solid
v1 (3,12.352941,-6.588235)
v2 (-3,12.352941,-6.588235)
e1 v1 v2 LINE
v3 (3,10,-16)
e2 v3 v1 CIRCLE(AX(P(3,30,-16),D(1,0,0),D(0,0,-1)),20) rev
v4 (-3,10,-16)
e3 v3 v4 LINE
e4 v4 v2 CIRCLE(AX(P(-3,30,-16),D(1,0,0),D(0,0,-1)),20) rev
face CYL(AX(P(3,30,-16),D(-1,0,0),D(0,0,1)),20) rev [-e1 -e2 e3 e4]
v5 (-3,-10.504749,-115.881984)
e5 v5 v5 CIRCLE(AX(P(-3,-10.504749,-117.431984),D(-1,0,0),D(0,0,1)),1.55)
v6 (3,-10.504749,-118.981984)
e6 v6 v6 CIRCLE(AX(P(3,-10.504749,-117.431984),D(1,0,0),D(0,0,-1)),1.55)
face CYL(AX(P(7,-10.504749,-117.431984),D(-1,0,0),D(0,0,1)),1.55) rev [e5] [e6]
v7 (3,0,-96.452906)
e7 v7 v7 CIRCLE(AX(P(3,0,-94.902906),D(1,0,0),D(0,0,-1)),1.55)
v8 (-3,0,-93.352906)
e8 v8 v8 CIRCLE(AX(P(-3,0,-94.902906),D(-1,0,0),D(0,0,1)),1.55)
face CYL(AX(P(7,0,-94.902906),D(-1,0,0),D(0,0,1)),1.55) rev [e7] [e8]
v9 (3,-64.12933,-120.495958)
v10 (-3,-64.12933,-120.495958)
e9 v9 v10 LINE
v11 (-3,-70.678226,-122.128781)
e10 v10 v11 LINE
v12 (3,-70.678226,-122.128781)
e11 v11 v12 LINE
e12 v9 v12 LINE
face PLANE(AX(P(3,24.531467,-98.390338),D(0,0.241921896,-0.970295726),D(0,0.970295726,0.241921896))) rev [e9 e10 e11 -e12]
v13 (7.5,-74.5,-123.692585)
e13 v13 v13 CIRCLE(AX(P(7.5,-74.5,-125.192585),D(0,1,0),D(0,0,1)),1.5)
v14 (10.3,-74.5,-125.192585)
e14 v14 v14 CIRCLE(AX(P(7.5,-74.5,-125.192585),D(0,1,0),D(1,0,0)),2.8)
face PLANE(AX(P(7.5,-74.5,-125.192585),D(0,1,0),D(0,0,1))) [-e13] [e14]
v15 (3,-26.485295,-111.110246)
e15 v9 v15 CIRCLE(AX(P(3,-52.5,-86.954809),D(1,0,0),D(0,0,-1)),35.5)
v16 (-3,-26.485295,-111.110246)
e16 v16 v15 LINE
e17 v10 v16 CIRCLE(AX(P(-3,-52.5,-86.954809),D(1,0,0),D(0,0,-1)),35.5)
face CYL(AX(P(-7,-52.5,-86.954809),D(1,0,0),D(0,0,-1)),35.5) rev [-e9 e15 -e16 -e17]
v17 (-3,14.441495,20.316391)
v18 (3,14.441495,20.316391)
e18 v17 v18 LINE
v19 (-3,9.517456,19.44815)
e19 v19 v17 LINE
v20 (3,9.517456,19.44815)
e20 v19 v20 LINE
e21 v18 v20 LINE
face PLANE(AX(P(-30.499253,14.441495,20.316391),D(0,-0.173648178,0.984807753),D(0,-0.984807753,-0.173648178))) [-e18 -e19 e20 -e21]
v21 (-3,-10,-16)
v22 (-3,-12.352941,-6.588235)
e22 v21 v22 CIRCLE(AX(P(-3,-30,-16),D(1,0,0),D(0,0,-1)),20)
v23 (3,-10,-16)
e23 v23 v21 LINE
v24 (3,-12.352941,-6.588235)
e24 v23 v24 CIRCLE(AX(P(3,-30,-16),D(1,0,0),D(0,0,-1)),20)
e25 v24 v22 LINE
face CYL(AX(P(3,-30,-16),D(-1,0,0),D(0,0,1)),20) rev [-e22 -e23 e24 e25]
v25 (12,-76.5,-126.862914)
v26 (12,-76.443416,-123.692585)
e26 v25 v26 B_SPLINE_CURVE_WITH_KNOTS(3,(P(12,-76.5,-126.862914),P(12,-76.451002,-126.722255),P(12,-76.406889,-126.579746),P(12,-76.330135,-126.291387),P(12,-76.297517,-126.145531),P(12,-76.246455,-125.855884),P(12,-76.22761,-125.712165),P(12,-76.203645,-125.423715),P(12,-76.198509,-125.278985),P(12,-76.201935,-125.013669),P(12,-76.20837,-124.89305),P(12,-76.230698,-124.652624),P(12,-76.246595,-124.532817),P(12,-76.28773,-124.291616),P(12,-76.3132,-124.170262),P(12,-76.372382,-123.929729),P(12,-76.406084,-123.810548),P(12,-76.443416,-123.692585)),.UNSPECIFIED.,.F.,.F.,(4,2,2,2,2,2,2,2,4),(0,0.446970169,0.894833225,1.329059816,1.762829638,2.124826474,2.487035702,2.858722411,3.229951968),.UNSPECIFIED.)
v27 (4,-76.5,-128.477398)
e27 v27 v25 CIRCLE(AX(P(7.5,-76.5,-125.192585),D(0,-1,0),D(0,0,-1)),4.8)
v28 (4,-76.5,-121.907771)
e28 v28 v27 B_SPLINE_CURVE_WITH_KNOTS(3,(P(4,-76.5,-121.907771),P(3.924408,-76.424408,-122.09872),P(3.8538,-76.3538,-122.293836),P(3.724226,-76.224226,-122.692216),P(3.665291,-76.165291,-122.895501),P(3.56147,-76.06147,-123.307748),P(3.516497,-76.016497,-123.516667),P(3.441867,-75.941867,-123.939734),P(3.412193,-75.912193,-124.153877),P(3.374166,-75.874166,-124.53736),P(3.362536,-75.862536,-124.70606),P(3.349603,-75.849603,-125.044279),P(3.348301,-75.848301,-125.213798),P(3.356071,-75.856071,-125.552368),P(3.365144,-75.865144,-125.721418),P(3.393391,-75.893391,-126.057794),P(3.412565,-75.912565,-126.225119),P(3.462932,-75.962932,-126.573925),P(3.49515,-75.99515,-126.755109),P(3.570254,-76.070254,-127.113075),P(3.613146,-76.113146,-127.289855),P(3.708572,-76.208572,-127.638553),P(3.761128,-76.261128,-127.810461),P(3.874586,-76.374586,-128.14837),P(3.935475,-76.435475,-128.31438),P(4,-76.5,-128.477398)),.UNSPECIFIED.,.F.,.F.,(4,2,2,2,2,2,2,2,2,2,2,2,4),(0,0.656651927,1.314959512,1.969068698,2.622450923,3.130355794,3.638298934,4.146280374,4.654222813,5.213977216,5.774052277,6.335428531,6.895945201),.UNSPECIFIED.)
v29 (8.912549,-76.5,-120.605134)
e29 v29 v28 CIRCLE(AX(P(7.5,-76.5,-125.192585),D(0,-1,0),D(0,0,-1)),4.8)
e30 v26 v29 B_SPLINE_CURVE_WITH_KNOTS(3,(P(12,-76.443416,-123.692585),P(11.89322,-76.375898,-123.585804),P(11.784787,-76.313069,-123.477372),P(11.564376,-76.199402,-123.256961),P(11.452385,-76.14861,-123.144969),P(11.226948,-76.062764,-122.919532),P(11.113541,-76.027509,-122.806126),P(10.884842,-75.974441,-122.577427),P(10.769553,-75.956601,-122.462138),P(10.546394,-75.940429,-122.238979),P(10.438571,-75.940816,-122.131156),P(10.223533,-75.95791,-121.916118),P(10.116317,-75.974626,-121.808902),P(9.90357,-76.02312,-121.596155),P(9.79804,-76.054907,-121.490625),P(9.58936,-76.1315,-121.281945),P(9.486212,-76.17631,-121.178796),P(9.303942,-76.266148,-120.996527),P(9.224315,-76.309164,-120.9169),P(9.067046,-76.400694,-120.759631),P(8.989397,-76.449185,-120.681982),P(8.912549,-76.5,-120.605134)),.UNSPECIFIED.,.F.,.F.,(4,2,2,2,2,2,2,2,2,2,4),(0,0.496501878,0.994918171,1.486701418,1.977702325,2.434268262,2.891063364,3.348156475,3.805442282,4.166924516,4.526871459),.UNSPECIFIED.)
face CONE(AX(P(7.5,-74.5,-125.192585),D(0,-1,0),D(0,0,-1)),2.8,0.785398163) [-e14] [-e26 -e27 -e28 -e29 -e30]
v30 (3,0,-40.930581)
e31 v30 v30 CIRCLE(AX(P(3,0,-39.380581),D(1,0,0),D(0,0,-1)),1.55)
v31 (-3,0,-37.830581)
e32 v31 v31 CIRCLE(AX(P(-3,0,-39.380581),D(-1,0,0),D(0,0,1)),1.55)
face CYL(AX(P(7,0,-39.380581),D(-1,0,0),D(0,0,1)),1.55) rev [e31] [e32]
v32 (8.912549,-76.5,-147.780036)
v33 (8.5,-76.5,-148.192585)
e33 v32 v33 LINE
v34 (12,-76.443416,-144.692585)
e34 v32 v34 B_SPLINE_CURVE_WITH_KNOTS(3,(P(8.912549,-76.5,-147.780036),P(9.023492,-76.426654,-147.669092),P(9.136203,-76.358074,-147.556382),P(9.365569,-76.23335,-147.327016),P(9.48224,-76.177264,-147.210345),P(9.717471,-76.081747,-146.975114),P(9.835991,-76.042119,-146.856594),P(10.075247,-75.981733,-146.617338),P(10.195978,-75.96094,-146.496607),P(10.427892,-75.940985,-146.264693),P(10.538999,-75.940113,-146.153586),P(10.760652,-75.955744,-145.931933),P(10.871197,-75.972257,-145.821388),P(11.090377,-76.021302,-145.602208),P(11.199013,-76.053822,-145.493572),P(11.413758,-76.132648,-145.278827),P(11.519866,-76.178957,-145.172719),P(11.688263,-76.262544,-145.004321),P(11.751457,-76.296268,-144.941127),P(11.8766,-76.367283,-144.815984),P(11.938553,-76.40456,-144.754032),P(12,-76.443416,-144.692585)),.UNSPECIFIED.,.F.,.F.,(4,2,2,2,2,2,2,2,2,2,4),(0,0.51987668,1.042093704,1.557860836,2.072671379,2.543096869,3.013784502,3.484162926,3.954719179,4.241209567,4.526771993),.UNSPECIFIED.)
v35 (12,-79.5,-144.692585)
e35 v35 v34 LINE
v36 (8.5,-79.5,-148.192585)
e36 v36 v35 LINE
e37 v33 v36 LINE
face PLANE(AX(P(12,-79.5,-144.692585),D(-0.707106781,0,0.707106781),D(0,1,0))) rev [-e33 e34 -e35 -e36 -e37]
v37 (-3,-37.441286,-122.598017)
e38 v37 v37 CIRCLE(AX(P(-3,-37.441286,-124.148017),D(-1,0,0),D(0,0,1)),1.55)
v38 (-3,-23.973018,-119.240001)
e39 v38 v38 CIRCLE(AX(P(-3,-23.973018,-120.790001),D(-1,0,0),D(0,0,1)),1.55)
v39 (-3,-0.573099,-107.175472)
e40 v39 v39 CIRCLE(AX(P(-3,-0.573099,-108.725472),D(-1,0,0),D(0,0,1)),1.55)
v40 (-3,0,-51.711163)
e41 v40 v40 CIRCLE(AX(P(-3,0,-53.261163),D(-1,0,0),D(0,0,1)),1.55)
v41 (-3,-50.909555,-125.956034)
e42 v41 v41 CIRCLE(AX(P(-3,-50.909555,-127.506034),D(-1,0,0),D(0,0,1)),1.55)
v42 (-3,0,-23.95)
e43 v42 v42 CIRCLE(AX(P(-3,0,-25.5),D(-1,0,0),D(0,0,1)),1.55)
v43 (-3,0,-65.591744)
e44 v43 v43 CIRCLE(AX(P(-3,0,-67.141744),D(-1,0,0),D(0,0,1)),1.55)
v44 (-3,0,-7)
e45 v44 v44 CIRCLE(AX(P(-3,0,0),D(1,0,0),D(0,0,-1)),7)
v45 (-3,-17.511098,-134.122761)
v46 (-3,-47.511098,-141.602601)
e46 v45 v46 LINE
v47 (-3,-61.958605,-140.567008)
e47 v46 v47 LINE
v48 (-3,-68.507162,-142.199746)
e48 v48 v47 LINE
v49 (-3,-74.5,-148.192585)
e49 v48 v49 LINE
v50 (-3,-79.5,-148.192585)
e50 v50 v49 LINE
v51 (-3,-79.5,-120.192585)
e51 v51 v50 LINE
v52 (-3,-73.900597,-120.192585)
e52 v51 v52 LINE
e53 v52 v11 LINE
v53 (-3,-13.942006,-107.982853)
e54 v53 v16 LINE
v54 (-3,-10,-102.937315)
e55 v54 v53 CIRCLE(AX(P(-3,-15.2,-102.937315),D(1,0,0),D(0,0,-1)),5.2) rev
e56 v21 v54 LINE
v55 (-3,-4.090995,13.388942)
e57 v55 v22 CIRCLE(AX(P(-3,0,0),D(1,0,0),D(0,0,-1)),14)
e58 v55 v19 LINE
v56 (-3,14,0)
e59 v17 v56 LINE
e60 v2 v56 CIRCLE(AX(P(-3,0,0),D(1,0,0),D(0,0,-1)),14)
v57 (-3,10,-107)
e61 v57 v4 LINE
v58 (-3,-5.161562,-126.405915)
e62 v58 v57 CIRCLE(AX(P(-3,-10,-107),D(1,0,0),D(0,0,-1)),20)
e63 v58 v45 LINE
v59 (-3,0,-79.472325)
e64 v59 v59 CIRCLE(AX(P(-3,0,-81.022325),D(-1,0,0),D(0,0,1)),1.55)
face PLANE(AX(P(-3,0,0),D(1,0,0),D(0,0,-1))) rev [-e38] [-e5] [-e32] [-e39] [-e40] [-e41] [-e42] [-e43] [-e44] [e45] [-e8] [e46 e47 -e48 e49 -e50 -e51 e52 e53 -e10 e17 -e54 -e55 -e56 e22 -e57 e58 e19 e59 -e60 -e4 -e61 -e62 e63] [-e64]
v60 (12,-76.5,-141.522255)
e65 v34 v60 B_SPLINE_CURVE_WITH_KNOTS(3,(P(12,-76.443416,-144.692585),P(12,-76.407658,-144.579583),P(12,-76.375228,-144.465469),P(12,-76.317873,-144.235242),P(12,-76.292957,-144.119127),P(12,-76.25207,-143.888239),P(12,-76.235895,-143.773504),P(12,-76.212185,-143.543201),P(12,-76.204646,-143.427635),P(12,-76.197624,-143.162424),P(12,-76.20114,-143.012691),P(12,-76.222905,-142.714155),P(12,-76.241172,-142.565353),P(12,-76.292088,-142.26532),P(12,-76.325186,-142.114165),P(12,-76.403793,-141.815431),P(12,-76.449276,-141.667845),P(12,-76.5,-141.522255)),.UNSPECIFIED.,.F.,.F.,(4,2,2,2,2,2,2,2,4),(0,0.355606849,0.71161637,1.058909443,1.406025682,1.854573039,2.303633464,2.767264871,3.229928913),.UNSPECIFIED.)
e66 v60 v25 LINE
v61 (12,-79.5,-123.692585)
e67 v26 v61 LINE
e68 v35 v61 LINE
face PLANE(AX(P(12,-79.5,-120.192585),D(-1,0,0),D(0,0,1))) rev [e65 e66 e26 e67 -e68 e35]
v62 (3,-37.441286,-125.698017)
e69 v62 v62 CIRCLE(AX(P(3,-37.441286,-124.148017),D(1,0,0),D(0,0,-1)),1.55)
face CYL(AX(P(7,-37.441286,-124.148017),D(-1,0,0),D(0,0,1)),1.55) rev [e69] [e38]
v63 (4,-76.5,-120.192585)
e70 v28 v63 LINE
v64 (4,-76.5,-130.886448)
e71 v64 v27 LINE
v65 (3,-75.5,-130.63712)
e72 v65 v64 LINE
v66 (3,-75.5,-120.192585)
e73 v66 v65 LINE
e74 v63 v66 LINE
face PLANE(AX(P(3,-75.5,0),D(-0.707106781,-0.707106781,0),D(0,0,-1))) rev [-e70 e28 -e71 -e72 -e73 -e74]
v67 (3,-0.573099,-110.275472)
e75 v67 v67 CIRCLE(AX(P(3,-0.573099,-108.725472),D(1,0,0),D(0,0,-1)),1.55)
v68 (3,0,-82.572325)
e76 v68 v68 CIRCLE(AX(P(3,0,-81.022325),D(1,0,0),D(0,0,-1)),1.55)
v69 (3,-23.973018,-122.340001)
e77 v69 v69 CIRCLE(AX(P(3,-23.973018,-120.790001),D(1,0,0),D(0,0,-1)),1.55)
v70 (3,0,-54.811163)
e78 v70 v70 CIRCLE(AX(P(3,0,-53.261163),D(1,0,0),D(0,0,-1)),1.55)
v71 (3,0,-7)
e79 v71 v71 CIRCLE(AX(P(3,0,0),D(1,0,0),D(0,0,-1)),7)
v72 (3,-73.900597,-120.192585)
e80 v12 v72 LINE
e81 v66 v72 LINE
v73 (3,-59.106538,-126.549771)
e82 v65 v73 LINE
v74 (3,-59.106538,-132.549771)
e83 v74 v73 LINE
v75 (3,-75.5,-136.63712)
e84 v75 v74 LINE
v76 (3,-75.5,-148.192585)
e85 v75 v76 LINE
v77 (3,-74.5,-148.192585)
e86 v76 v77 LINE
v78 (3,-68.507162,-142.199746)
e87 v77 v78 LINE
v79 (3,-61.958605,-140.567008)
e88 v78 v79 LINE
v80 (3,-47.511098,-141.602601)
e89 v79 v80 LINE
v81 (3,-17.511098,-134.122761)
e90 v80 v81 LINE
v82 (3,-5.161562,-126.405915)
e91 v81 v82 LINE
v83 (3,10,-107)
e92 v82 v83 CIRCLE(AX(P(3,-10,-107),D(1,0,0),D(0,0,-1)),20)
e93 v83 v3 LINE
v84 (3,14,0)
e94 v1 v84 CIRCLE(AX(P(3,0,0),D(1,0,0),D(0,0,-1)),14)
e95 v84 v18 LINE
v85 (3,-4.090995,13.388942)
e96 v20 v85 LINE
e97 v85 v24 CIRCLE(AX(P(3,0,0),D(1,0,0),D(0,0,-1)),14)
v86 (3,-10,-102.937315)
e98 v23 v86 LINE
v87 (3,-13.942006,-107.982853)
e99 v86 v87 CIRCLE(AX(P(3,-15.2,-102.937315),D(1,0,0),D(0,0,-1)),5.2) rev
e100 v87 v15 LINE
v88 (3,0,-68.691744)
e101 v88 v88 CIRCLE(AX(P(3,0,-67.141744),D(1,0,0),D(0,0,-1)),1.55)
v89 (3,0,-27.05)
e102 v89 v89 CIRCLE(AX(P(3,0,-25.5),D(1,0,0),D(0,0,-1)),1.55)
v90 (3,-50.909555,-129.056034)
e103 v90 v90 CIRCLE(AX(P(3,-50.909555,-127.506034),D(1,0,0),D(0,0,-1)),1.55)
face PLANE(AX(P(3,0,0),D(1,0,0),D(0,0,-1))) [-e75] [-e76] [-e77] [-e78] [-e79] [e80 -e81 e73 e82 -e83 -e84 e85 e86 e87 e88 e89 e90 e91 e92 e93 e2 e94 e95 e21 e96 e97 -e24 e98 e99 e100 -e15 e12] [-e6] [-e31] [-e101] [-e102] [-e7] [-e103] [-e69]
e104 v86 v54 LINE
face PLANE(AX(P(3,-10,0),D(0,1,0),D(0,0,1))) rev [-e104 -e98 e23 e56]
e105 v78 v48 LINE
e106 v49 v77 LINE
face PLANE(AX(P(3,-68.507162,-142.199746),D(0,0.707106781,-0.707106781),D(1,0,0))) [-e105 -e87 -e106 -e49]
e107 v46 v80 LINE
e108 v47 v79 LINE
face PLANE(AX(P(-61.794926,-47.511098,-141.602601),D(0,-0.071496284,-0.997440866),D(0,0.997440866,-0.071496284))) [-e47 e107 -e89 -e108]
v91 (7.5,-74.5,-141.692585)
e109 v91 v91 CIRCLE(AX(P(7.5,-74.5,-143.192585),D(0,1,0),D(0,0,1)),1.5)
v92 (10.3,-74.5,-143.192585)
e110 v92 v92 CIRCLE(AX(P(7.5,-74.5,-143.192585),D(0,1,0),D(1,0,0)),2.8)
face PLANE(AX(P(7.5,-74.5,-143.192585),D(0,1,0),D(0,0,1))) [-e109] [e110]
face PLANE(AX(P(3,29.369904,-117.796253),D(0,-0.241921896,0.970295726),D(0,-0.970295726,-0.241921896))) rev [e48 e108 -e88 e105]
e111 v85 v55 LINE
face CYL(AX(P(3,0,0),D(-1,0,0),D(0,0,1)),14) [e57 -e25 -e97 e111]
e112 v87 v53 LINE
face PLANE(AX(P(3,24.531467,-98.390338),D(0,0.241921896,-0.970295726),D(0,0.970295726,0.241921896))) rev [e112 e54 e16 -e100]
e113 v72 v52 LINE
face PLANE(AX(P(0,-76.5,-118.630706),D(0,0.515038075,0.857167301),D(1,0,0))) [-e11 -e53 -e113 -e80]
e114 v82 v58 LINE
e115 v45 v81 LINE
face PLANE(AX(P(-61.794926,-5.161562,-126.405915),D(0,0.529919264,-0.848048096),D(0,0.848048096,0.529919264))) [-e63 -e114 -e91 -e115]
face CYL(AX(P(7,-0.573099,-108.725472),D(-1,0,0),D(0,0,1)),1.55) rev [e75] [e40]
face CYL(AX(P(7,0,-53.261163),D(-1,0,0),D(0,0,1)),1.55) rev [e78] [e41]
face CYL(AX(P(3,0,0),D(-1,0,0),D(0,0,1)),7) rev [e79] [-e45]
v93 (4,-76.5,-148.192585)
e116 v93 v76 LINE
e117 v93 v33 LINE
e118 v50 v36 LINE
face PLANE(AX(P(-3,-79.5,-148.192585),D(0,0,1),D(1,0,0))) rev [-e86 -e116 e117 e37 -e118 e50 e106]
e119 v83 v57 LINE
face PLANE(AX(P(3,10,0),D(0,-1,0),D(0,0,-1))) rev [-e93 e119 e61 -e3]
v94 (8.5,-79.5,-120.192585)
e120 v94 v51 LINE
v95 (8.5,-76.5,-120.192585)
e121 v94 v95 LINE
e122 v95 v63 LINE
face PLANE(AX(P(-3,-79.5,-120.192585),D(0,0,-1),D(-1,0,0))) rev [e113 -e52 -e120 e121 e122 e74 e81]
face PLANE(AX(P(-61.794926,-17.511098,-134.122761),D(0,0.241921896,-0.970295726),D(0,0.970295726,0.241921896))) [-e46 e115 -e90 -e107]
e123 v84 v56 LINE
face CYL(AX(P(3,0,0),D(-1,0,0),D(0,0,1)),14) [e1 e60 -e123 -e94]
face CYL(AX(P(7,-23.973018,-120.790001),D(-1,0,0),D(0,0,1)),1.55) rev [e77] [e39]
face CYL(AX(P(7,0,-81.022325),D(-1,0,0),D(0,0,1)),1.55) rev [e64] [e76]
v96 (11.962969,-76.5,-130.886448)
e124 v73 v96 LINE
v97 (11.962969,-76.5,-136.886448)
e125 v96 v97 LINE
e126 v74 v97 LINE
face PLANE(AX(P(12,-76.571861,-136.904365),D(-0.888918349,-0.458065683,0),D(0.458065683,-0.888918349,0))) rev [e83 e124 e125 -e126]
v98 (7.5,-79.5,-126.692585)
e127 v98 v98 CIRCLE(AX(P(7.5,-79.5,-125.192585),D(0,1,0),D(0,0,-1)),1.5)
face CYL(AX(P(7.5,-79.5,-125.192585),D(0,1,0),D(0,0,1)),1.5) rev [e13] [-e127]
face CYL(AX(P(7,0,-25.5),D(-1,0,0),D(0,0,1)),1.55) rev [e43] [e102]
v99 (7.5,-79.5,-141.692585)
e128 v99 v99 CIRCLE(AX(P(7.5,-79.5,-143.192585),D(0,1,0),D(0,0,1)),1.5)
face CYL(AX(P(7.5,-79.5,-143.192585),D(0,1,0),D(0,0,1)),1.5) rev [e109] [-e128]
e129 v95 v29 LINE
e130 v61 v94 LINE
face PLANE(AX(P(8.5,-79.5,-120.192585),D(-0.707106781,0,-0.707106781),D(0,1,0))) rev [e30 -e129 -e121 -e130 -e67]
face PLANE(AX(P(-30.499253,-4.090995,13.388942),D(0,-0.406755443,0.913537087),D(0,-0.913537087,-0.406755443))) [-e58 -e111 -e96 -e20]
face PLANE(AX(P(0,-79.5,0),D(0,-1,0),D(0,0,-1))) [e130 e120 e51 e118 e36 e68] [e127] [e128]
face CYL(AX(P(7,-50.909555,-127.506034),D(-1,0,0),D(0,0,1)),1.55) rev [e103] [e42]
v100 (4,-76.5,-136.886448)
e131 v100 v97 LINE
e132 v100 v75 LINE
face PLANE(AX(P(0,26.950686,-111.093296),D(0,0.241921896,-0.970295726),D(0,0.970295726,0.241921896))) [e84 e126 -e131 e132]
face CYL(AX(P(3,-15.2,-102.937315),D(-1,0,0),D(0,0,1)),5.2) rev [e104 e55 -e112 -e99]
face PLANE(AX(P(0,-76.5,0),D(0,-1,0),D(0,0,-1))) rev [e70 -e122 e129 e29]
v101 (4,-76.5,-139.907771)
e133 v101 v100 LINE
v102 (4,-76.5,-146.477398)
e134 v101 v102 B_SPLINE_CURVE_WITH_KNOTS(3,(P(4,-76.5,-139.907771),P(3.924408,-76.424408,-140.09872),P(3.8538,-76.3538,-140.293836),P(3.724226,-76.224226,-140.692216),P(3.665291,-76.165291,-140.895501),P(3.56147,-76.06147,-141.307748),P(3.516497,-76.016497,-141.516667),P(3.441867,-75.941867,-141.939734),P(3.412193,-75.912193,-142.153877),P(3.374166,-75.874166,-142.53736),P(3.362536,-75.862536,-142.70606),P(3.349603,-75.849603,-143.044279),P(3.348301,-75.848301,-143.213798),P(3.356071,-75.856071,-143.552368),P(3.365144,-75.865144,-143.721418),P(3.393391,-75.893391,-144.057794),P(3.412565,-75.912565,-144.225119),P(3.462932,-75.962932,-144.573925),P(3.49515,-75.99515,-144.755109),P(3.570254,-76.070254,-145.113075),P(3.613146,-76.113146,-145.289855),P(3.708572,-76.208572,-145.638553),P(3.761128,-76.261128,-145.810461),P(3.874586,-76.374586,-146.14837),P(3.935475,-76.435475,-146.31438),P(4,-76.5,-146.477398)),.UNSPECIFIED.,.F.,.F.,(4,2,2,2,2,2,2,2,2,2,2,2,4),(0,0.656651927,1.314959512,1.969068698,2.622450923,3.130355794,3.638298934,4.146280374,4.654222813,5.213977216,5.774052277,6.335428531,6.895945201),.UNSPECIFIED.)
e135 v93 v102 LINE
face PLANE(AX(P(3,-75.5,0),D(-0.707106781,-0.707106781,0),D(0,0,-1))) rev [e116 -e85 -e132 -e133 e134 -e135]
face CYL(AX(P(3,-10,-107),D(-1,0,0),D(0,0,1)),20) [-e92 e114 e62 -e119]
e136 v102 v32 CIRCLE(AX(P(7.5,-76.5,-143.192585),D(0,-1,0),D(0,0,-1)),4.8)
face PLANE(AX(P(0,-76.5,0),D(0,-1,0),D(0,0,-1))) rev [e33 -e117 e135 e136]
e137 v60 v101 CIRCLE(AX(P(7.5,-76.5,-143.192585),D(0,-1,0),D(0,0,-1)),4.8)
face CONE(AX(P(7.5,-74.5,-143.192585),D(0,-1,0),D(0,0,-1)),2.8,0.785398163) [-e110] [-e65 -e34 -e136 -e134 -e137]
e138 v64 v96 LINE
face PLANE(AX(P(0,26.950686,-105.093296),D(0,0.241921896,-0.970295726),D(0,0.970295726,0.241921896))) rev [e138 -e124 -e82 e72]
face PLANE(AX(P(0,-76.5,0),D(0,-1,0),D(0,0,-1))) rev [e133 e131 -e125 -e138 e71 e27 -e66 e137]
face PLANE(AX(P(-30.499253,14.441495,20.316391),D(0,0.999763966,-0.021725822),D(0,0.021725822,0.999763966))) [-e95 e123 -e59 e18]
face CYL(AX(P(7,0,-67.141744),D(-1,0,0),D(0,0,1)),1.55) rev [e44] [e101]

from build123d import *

# Parameters (mm, degrees)
SKETCH_1_R                = 7
EXTRUDE_1_DEPTH           = 3
SKETCH_5_W                = 15
SKETCH_5_H                = 28
EXTRUDE_3_DEPTH           = 3
SKETCH_6_R                = 1.5
CUT_EXTRUDE_2_DEPTH       = 175.055428478
CHAMFER_1_SIZE            = 3.5
SKETCH_10_R               = 1.55
CUT_EXTRUDE_3_DEPTH       = 10
PATTERN_START             = -3
PATTERN_CURVE_1_OUTLINE_R = 1.55
PATTERN_CURVE_1_DEPTH     = 6
EXTRUDE_4_DEPTH           = 6
EXTRUDE_5_DEPTH           = 3
CHAMFER_2_SIZE            = 1
CHAMFER_3_SIZE            = 4.949606318
CHAMFER_3_SIZE_2          = 6
CHAMFER_3_SIZE_3          = 8.237528241
EXTRUDE_START             = 2
SKETCH_17_R               = 2.8
SKETCH_17_R_2             = 1.5
EXTRUDE_1_2_DEPTH         = 2
CHAMFER_4_SIZE            = 2
SKETCH1_R                 = 35.5
CUT_EXTRUDE1_DEPTH        = 10
BOSS_EXTRUDE1_DEPTH       = 6


# Read off the part's stored shape, not the designer's step: 曲线阵列1
with BuildPart() as part:
    # 草图1 → Extrude 1 (new, symmetric)
    with BuildSketch(Plane(origin=(0, 0, 0), x_dir=(0, 0, -1), z_dir=(1, 0, 0))):
        with BuildLine():
            ThreePointArc((102.937314742, -10), (106.138754414, -11.102344081), (107.982852519, -13.942006143))
            Line((107.982852519, -13.942006143), (123.580312189, -76.5))
            Line((123.580312189, -76.5), (144.192584776, -76.5))
            Line((144.192584776, -76.5), (126.405914526, -5.161562088))
            ThreePointArc((126.405914526, -5.161562088), (119.313229507, 5.760215072), (107, 10))
            Line((107, 10), (16, 10))
            ThreePointArc((16, 10), (11.149287499, 10.597149997), (6.588235294, 12.352941176))
            ThreePointArc((6.588235294, 12.352941176), (3.395498751, 13.581995002), (0, 14))
            Line((0, 14), (-18, 14))
            Line((-18, 14), (-18, 11))
            Line((-18, 11), (-13.388941598, -4.090995342))
            ThreePointArc((-13.388941598, -4.090995342), (-5.350452205, -12.937258643), (6.588235294, -12.352941176))
            ThreePointArc((6.588235294, -12.352941176), (11.149287499, -10.597149997), (16, -10))
            Line((16, -10), (102.937314742, -10))
        make_face()
        Circle(SKETCH_1_R, mode=Mode.SUBTRACT)
    extrude(amount=EXTRUDE_1_DEPTH, both=True)

    # 草图5 → 凸台-拉伸3 (add)
    with BuildSketch(Plane.XZ.offset(76.5)):
        with Locations((4.5, -134.192584776)):
            Rectangle(SKETCH_5_W, SKETCH_5_H)
    extrude(amount=EXTRUDE_3_DEPTH)

    # 草图6 → 切除-拉伸2 (cut, through all)
    with BuildSketch(Plane(origin=(0, -76.5, 0), x_dir=(1, 0, 0), z_dir=(0, 1, 0))):
        with Locations(Location((7.5, 143.192584776, 0), (0, 0, 270))):
            Circle(SKETCH_6_R)
        with Locations(Location((7.5, 125.192584776, 0), (0, 0, 90))):
            Circle(SKETCH_6_R)
    extrude(amount=-CUT_EXTRUDE_2_DEPTH, mode=Mode.SUBTRACT)

    # 倒角1
    chamfer_1_edges = [part.edges().sort_by_distance(p)[0] for p in [
        (12, -78, -148.192584776),
        (12, -78, -120.192584776),
    ]]
    chamfer(chamfer_1_edges, length=CHAMFER_1_SIZE)

    # 草图10 → 切除-拉伸3 (cut)
    with BuildSketch(Plane.ZY.offset(3)):
        with Locations((-25.5, 0)):
            Circle(SKETCH_10_R)
    extrude(amount=-CUT_EXTRUDE_3_DEPTH, mode=Mode.SUBTRACT)

    # 曲线阵列1 outline → 曲线阵列1 (cut)
    with BuildSketch(Plane.YZ.offset(PATTERN_START)):
        with Locations((-50.909555093, -127.506033962)):
            Circle(PATTERN_CURVE_1_OUTLINE_R)
        with Locations((-37.441286405, -124.148017428)):
            Circle(PATTERN_CURVE_1_OUTLINE_R)
        with Locations((-23.973017717, -120.790000895)):
            Circle(PATTERN_CURVE_1_OUTLINE_R)
        with Locations((-10.504749029, -117.431984361)):
            Circle(PATTERN_CURVE_1_OUTLINE_R)
        with Locations((-0.573099264, -108.725472335)):
            Circle(PATTERN_CURVE_1_OUTLINE_R)
        with Locations((0, -94.902906369)):
            Circle(PATTERN_CURVE_1_OUTLINE_R)
        with Locations((0, -81.022325095)):
            Circle(PATTERN_CURVE_1_OUTLINE_R)
        with Locations((0, -67.141743821)):
            Circle(PATTERN_CURVE_1_OUTLINE_R)
        with Locations((0, -53.261162547)):
            Circle(PATTERN_CURVE_1_OUTLINE_R)
        with Locations((0, -39.380581274)):
            Circle(PATTERN_CURVE_1_OUTLINE_R)
    extrude(amount=PATTERN_CURVE_1_DEPTH, mode=Mode.SUBTRACT)

    # 草图15 → 凸台-拉伸4 (add)
    with BuildSketch(Plane(origin=(3, 0, 0), x_dir=(0, 0, -1), z_dir=(1, 0, 0))):
        Polygon((-20.316390831, 14.441494507), (-19.448149943, 9.517455742), (-13.388941598, -4.090995342), (-18, 11), (-18, 14), (0, 14), align=None)
    extrude(amount=-EXTRUDE_4_DEPTH)

    # 草图16 → 凸台-拉伸5 (add, symmetric, along a direction that is not the sketch's normal)
    with BuildSketch(Plane(origin=(0, 26.950685529, -108.093295667), x_dir=(-1, 0, 0), z_dir=(0, 0.2419218955996646, -0.9702957262759974))):
        Polygon((-12, -106.691747545), (-3, -88.691747545), (-3, -106.691747545), align=None)
    extrude(amount=EXTRUDE_5_DEPTH, dir=(0, 0, -1), both=True)

    # 倒角2
    chamfer_2_edges = [part.edges().sort_by_distance(p)[0] for p in [
        (3, -76.5, -140.539516629),
        (3, -76.5, -127.233380336),
    ]]
    chamfer(chamfer_2_edges, length=CHAMFER_2_SIZE)

    # 倒角3
    # the kernel refuses this chamfer: 8.237528241, 6, 4.949606318 mm, written as the material it adds along each edge
    with BuildSketch(Plane(origin=(19.430097928, -76.5, -123.580312189), x_dir=(0, -0.04051695164362419, 0.9991788511720553), z_dir=(-1, 0, 0))) as chamfer_3_piece_1_section:
        Polygon((CHAMFER_3_SIZE * 0.999178851168, CHAMFER_3_SIZE * 0.0405169516434), (CHAMFER_3_SIZE_2 * 0.202409816697, CHAMFER_3_SIZE_2 * 0.979300906823), (0, 0), align=None)
    chamfer_3_piece_1 = extrude(amount=22.430097928, mode=Mode.PRIVATE)
    chamfer_3_piece_1 = split(chamfer_3_piece_1, bisect_by=Plane(origin=(3, -73.046454267, -121.751433379), z_dir=(-1, 0, 0)), keep=Keep.TOP, mode=Mode.PRIVATE)
    chamfer_3_piece_1 = split(chamfer_3_piece_1, bisect_by=Plane(origin=(1.773227133, -73.046454267, -120.192584776), z_dir=(0, 0, -1)), keep=Keep.TOP, mode=Mode.PRIVATE)
    add(chamfer_3_piece_1)
    with BuildSketch(Plane(origin=(19.430097928, -76.5, -123.580312189), x_dir=(0, -0.04051695164362419, 0.9991788511720553), z_dir=(-1, 0, 0))) as chamfer_3_piece_2_section:
        Polygon((CHAMFER_3_SIZE * 0.999178851168, CHAMFER_3_SIZE * 0.0405169516434), (CHAMFER_3_SIZE_2 * 0.202409816697, CHAMFER_3_SIZE_2 * 0.979300906823), (0, 0), align=None)
    chamfer_3_piece_2 = extrude(amount=22.430097928, mode=Mode.PRIVATE)
    chamfer_3_piece_2 = split(chamfer_3_piece_2, bisect_by=Plane(origin=(3.335429121, -76.170858242, -120.192584776), z_dir=(0, 0, -1)), keep=Keep.TOP, mode=Mode.PRIVATE)
    chamfer_3_piece_2 = split(chamfer_3_piece_2, bisect_by=Plane(origin=(3.503143682, -76.003143682, -121.845416354), z_dir=(-0.7071067811865476, -0.7071067811865476, 0)), keep=Keep.TOP, mode=Mode.PRIVATE)
    add(chamfer_3_piece_2)
    with BuildSketch(Plane(origin=(-3, -76.5, -144.192584776), x_dir=(4.057410477830116e-15, -0.037354428652640735, -0.9993020797837033), z_dir=(1, 0, 0))) as chamfer_3_piece_3_section:
        Polygon((CHAMFER_3_SIZE_2 * 0.999302079784, CHAMFER_3_SIZE_2 * 0.0373544286526), (-CHAMFER_3_SIZE_3 * 0.277997895888, CHAMFER_3_SIZE_3 * 0.960581683052), (0, 0), align=None)
    chamfer_3_piece_3 = extrude(amount=28.304139536, mode=Mode.PRIVATE)
    chamfer_3_piece_3 = split(chamfer_3_piece_3, bisect_by=Plane(origin=(0.670769547, -73.170769547, -145.630202159), z_dir=(-0.7071067811865476, -0.7071067811865476, 0)), keep=Keep.TOP, mode=Mode.PRIVATE)
    chamfer_3_piece_3 = split(chamfer_3_piece_3, bisect_by=Plane(origin=(-0.598503723, -74.440042816, -148.192584776), z_dir=(0, 0, 1)), keep=Keep.TOP, mode=Mode.PRIVATE)
    add(chamfer_3_piece_3)
    with BuildSketch(Plane(origin=(-3, -76.5, -144.192584776), x_dir=(4.057410477830116e-15, -0.037354428652640735, -0.9993020797837033), z_dir=(1, 0, 0))) as chamfer_3_piece_4_section:
        Polygon((CHAMFER_3_SIZE_2 * 0.999302079784, CHAMFER_3_SIZE_2 * 0.0373544286526), (-CHAMFER_3_SIZE_3 * 0.277997895888, CHAMFER_3_SIZE_3 * 0.960581683052), (0, 0), align=None)
    chamfer_3_piece_4 = extrude(amount=28.304139536, mode=Mode.PRIVATE)
    chamfer_3_piece_4 = split(chamfer_3_piece_4, bisect_by=Plane(origin=(3, -72.000472632, -144.373314083), z_dir=(-1, 0, 0)), keep=Keep.TOP, mode=Mode.PRIVATE)
    chamfer_3_piece_4 = split(chamfer_3_piece_4, bisect_by=Plane(origin=(1.258880845, -72.000472632, -148.192584776), z_dir=(0, 0, 1)), keep=Keep.TOP, mode=Mode.PRIVATE)
    add(chamfer_3_piece_4)

    # 草图17 → Extrude 1 2 (add)
    # profile 1 of 2: a face of its own
    with BuildSketch(Plane(origin=(0, -76.5, 0), x_dir=(1, 0, 0), z_dir=(0, 1, 0)).offset(EXTRUDE_START)):
        with Locations((7.5, 125.192584776)):
            Circle(SKETCH_17_R)
        with Locations((7.5, 125.192584776)):
            Circle(SKETCH_17_R_2, mode=Mode.SUBTRACT)
    # profile 2 of 2: a face of its own
    with BuildSketch(Plane(origin=(0, -76.5, 0), x_dir=(1, 0, 0), z_dir=(0, 1, 0)).offset(EXTRUDE_START)):
        with Locations((7.5, 143.192584776)):
            Circle(SKETCH_17_R)
        with Locations((7.5, 143.192584776)):
            Circle(SKETCH_17_R_2, mode=Mode.SUBTRACT)
    extrude(amount=-EXTRUDE_1_2_DEPTH)

    # 倒角4
    # the kernel refuses this chamfer: 2 mm, written as the material it adds along each edge
    with BuildSketch(Plane(origin=(7.5, -76.5, -125.192584776), x_dir=(1, 0, 0), z_dir=(0, 0, 1))) as chamfer_4_piece_1_section:
        Polygon((2.8 + CHAMFER_4_SIZE, 0), (2.8, CHAMFER_4_SIZE), (2.8, 0), align=None)
    chamfer_4_piece_1 = revolve(axis=Axis((7.5, -76.5, -125.192584776), (0, 1, 0)), mode=Mode.PRIVATE)
    chamfer_4_piece_1 = split(chamfer_4_piece_1, bisect_by=Plane(origin=(8.598627061, -75.553822664, -120.291211837), z_dir=(-0.7071067811865476, 0, -0.7071067811865476)), keep=Keep.TOP, mode=Mode.PRIVATE)
    chamfer_4_piece_1 = split(chamfer_4_piece_1, bisect_by=Plane(origin=(12, -75.553822664, -125.192584776), z_dir=(-1, 0, 0)), keep=Keep.TOP, mode=Mode.PRIVATE)
    chamfer_4_piece_1 = split(chamfer_4_piece_1, bisect_by=Plane(origin=(3.697254122, -74.5, -125.192584776), z_dir=(0, -1, 0)), keep=Keep.TOP, mode=Mode.PRIVATE)
    add(chamfer_4_piece_1)
    with BuildSketch(Plane(origin=(7.5, -76.5, -143.192584776), x_dir=(1, 0, 0), z_dir=(0, 0, 1))) as chamfer_4_piece_2_section:
        Polygon((2.8 + CHAMFER_4_SIZE, 0), (2.8, CHAMFER_4_SIZE), (2.8, 0), align=None)
    chamfer_4_piece_2 = revolve(axis=Axis((7.5, -76.5, -143.192584776), (0, 1, 0)), mode=Mode.PRIVATE)
    chamfer_4_piece_2 = split(chamfer_4_piece_2, bisect_by=Plane(origin=(8.598627061, -75.553822664, -148.093957715), z_dir=(-0.7071067811865476, 0, 0.7071067811865476)), keep=Keep.TOP, mode=Mode.PRIVATE)
    chamfer_4_piece_2 = split(chamfer_4_piece_2, bisect_by=Plane(origin=(12, -75.553822664, -143.192584776), z_dir=(-1, 0, 0)), keep=Keep.TOP, mode=Mode.PRIVATE)
    chamfer_4_piece_2 = split(chamfer_4_piece_2, bisect_by=Plane(origin=(3.697254121, -74.5, -143.192584776), z_dir=(0, -1, 0)), keep=Keep.TOP, mode=Mode.PRIVATE)
    add(chamfer_4_piece_2)

    # Sketch1 → Cut-Extrude1 (cut)
    with BuildSketch(Plane(origin=(3, 0, 0), x_dir=(0, 0, -1), z_dir=(1, 0, 0))):
        with Locations((86.954808596, -52.5)):
            Circle(SKETCH1_R)
    extrude(amount=-CUT_EXTRUDE1_DEPTH, mode=Mode.SUBTRACT)

    # Sketch2 → Boss-Extrude1 (add)
    with BuildSketch(Plane(origin=(3, 0, 0), x_dir=(0, 0, -1), z_dir=(1, 0, 0))):
        Polygon((126.405914526, -5.161562088), (134.122760953, -17.511097881), (141.602601038, -47.511097881), (140.567007759, -61.958604825), align=None)
    extrude(amount=-BOSS_EXTRUDE1_DEPTH)


solid = part.part
